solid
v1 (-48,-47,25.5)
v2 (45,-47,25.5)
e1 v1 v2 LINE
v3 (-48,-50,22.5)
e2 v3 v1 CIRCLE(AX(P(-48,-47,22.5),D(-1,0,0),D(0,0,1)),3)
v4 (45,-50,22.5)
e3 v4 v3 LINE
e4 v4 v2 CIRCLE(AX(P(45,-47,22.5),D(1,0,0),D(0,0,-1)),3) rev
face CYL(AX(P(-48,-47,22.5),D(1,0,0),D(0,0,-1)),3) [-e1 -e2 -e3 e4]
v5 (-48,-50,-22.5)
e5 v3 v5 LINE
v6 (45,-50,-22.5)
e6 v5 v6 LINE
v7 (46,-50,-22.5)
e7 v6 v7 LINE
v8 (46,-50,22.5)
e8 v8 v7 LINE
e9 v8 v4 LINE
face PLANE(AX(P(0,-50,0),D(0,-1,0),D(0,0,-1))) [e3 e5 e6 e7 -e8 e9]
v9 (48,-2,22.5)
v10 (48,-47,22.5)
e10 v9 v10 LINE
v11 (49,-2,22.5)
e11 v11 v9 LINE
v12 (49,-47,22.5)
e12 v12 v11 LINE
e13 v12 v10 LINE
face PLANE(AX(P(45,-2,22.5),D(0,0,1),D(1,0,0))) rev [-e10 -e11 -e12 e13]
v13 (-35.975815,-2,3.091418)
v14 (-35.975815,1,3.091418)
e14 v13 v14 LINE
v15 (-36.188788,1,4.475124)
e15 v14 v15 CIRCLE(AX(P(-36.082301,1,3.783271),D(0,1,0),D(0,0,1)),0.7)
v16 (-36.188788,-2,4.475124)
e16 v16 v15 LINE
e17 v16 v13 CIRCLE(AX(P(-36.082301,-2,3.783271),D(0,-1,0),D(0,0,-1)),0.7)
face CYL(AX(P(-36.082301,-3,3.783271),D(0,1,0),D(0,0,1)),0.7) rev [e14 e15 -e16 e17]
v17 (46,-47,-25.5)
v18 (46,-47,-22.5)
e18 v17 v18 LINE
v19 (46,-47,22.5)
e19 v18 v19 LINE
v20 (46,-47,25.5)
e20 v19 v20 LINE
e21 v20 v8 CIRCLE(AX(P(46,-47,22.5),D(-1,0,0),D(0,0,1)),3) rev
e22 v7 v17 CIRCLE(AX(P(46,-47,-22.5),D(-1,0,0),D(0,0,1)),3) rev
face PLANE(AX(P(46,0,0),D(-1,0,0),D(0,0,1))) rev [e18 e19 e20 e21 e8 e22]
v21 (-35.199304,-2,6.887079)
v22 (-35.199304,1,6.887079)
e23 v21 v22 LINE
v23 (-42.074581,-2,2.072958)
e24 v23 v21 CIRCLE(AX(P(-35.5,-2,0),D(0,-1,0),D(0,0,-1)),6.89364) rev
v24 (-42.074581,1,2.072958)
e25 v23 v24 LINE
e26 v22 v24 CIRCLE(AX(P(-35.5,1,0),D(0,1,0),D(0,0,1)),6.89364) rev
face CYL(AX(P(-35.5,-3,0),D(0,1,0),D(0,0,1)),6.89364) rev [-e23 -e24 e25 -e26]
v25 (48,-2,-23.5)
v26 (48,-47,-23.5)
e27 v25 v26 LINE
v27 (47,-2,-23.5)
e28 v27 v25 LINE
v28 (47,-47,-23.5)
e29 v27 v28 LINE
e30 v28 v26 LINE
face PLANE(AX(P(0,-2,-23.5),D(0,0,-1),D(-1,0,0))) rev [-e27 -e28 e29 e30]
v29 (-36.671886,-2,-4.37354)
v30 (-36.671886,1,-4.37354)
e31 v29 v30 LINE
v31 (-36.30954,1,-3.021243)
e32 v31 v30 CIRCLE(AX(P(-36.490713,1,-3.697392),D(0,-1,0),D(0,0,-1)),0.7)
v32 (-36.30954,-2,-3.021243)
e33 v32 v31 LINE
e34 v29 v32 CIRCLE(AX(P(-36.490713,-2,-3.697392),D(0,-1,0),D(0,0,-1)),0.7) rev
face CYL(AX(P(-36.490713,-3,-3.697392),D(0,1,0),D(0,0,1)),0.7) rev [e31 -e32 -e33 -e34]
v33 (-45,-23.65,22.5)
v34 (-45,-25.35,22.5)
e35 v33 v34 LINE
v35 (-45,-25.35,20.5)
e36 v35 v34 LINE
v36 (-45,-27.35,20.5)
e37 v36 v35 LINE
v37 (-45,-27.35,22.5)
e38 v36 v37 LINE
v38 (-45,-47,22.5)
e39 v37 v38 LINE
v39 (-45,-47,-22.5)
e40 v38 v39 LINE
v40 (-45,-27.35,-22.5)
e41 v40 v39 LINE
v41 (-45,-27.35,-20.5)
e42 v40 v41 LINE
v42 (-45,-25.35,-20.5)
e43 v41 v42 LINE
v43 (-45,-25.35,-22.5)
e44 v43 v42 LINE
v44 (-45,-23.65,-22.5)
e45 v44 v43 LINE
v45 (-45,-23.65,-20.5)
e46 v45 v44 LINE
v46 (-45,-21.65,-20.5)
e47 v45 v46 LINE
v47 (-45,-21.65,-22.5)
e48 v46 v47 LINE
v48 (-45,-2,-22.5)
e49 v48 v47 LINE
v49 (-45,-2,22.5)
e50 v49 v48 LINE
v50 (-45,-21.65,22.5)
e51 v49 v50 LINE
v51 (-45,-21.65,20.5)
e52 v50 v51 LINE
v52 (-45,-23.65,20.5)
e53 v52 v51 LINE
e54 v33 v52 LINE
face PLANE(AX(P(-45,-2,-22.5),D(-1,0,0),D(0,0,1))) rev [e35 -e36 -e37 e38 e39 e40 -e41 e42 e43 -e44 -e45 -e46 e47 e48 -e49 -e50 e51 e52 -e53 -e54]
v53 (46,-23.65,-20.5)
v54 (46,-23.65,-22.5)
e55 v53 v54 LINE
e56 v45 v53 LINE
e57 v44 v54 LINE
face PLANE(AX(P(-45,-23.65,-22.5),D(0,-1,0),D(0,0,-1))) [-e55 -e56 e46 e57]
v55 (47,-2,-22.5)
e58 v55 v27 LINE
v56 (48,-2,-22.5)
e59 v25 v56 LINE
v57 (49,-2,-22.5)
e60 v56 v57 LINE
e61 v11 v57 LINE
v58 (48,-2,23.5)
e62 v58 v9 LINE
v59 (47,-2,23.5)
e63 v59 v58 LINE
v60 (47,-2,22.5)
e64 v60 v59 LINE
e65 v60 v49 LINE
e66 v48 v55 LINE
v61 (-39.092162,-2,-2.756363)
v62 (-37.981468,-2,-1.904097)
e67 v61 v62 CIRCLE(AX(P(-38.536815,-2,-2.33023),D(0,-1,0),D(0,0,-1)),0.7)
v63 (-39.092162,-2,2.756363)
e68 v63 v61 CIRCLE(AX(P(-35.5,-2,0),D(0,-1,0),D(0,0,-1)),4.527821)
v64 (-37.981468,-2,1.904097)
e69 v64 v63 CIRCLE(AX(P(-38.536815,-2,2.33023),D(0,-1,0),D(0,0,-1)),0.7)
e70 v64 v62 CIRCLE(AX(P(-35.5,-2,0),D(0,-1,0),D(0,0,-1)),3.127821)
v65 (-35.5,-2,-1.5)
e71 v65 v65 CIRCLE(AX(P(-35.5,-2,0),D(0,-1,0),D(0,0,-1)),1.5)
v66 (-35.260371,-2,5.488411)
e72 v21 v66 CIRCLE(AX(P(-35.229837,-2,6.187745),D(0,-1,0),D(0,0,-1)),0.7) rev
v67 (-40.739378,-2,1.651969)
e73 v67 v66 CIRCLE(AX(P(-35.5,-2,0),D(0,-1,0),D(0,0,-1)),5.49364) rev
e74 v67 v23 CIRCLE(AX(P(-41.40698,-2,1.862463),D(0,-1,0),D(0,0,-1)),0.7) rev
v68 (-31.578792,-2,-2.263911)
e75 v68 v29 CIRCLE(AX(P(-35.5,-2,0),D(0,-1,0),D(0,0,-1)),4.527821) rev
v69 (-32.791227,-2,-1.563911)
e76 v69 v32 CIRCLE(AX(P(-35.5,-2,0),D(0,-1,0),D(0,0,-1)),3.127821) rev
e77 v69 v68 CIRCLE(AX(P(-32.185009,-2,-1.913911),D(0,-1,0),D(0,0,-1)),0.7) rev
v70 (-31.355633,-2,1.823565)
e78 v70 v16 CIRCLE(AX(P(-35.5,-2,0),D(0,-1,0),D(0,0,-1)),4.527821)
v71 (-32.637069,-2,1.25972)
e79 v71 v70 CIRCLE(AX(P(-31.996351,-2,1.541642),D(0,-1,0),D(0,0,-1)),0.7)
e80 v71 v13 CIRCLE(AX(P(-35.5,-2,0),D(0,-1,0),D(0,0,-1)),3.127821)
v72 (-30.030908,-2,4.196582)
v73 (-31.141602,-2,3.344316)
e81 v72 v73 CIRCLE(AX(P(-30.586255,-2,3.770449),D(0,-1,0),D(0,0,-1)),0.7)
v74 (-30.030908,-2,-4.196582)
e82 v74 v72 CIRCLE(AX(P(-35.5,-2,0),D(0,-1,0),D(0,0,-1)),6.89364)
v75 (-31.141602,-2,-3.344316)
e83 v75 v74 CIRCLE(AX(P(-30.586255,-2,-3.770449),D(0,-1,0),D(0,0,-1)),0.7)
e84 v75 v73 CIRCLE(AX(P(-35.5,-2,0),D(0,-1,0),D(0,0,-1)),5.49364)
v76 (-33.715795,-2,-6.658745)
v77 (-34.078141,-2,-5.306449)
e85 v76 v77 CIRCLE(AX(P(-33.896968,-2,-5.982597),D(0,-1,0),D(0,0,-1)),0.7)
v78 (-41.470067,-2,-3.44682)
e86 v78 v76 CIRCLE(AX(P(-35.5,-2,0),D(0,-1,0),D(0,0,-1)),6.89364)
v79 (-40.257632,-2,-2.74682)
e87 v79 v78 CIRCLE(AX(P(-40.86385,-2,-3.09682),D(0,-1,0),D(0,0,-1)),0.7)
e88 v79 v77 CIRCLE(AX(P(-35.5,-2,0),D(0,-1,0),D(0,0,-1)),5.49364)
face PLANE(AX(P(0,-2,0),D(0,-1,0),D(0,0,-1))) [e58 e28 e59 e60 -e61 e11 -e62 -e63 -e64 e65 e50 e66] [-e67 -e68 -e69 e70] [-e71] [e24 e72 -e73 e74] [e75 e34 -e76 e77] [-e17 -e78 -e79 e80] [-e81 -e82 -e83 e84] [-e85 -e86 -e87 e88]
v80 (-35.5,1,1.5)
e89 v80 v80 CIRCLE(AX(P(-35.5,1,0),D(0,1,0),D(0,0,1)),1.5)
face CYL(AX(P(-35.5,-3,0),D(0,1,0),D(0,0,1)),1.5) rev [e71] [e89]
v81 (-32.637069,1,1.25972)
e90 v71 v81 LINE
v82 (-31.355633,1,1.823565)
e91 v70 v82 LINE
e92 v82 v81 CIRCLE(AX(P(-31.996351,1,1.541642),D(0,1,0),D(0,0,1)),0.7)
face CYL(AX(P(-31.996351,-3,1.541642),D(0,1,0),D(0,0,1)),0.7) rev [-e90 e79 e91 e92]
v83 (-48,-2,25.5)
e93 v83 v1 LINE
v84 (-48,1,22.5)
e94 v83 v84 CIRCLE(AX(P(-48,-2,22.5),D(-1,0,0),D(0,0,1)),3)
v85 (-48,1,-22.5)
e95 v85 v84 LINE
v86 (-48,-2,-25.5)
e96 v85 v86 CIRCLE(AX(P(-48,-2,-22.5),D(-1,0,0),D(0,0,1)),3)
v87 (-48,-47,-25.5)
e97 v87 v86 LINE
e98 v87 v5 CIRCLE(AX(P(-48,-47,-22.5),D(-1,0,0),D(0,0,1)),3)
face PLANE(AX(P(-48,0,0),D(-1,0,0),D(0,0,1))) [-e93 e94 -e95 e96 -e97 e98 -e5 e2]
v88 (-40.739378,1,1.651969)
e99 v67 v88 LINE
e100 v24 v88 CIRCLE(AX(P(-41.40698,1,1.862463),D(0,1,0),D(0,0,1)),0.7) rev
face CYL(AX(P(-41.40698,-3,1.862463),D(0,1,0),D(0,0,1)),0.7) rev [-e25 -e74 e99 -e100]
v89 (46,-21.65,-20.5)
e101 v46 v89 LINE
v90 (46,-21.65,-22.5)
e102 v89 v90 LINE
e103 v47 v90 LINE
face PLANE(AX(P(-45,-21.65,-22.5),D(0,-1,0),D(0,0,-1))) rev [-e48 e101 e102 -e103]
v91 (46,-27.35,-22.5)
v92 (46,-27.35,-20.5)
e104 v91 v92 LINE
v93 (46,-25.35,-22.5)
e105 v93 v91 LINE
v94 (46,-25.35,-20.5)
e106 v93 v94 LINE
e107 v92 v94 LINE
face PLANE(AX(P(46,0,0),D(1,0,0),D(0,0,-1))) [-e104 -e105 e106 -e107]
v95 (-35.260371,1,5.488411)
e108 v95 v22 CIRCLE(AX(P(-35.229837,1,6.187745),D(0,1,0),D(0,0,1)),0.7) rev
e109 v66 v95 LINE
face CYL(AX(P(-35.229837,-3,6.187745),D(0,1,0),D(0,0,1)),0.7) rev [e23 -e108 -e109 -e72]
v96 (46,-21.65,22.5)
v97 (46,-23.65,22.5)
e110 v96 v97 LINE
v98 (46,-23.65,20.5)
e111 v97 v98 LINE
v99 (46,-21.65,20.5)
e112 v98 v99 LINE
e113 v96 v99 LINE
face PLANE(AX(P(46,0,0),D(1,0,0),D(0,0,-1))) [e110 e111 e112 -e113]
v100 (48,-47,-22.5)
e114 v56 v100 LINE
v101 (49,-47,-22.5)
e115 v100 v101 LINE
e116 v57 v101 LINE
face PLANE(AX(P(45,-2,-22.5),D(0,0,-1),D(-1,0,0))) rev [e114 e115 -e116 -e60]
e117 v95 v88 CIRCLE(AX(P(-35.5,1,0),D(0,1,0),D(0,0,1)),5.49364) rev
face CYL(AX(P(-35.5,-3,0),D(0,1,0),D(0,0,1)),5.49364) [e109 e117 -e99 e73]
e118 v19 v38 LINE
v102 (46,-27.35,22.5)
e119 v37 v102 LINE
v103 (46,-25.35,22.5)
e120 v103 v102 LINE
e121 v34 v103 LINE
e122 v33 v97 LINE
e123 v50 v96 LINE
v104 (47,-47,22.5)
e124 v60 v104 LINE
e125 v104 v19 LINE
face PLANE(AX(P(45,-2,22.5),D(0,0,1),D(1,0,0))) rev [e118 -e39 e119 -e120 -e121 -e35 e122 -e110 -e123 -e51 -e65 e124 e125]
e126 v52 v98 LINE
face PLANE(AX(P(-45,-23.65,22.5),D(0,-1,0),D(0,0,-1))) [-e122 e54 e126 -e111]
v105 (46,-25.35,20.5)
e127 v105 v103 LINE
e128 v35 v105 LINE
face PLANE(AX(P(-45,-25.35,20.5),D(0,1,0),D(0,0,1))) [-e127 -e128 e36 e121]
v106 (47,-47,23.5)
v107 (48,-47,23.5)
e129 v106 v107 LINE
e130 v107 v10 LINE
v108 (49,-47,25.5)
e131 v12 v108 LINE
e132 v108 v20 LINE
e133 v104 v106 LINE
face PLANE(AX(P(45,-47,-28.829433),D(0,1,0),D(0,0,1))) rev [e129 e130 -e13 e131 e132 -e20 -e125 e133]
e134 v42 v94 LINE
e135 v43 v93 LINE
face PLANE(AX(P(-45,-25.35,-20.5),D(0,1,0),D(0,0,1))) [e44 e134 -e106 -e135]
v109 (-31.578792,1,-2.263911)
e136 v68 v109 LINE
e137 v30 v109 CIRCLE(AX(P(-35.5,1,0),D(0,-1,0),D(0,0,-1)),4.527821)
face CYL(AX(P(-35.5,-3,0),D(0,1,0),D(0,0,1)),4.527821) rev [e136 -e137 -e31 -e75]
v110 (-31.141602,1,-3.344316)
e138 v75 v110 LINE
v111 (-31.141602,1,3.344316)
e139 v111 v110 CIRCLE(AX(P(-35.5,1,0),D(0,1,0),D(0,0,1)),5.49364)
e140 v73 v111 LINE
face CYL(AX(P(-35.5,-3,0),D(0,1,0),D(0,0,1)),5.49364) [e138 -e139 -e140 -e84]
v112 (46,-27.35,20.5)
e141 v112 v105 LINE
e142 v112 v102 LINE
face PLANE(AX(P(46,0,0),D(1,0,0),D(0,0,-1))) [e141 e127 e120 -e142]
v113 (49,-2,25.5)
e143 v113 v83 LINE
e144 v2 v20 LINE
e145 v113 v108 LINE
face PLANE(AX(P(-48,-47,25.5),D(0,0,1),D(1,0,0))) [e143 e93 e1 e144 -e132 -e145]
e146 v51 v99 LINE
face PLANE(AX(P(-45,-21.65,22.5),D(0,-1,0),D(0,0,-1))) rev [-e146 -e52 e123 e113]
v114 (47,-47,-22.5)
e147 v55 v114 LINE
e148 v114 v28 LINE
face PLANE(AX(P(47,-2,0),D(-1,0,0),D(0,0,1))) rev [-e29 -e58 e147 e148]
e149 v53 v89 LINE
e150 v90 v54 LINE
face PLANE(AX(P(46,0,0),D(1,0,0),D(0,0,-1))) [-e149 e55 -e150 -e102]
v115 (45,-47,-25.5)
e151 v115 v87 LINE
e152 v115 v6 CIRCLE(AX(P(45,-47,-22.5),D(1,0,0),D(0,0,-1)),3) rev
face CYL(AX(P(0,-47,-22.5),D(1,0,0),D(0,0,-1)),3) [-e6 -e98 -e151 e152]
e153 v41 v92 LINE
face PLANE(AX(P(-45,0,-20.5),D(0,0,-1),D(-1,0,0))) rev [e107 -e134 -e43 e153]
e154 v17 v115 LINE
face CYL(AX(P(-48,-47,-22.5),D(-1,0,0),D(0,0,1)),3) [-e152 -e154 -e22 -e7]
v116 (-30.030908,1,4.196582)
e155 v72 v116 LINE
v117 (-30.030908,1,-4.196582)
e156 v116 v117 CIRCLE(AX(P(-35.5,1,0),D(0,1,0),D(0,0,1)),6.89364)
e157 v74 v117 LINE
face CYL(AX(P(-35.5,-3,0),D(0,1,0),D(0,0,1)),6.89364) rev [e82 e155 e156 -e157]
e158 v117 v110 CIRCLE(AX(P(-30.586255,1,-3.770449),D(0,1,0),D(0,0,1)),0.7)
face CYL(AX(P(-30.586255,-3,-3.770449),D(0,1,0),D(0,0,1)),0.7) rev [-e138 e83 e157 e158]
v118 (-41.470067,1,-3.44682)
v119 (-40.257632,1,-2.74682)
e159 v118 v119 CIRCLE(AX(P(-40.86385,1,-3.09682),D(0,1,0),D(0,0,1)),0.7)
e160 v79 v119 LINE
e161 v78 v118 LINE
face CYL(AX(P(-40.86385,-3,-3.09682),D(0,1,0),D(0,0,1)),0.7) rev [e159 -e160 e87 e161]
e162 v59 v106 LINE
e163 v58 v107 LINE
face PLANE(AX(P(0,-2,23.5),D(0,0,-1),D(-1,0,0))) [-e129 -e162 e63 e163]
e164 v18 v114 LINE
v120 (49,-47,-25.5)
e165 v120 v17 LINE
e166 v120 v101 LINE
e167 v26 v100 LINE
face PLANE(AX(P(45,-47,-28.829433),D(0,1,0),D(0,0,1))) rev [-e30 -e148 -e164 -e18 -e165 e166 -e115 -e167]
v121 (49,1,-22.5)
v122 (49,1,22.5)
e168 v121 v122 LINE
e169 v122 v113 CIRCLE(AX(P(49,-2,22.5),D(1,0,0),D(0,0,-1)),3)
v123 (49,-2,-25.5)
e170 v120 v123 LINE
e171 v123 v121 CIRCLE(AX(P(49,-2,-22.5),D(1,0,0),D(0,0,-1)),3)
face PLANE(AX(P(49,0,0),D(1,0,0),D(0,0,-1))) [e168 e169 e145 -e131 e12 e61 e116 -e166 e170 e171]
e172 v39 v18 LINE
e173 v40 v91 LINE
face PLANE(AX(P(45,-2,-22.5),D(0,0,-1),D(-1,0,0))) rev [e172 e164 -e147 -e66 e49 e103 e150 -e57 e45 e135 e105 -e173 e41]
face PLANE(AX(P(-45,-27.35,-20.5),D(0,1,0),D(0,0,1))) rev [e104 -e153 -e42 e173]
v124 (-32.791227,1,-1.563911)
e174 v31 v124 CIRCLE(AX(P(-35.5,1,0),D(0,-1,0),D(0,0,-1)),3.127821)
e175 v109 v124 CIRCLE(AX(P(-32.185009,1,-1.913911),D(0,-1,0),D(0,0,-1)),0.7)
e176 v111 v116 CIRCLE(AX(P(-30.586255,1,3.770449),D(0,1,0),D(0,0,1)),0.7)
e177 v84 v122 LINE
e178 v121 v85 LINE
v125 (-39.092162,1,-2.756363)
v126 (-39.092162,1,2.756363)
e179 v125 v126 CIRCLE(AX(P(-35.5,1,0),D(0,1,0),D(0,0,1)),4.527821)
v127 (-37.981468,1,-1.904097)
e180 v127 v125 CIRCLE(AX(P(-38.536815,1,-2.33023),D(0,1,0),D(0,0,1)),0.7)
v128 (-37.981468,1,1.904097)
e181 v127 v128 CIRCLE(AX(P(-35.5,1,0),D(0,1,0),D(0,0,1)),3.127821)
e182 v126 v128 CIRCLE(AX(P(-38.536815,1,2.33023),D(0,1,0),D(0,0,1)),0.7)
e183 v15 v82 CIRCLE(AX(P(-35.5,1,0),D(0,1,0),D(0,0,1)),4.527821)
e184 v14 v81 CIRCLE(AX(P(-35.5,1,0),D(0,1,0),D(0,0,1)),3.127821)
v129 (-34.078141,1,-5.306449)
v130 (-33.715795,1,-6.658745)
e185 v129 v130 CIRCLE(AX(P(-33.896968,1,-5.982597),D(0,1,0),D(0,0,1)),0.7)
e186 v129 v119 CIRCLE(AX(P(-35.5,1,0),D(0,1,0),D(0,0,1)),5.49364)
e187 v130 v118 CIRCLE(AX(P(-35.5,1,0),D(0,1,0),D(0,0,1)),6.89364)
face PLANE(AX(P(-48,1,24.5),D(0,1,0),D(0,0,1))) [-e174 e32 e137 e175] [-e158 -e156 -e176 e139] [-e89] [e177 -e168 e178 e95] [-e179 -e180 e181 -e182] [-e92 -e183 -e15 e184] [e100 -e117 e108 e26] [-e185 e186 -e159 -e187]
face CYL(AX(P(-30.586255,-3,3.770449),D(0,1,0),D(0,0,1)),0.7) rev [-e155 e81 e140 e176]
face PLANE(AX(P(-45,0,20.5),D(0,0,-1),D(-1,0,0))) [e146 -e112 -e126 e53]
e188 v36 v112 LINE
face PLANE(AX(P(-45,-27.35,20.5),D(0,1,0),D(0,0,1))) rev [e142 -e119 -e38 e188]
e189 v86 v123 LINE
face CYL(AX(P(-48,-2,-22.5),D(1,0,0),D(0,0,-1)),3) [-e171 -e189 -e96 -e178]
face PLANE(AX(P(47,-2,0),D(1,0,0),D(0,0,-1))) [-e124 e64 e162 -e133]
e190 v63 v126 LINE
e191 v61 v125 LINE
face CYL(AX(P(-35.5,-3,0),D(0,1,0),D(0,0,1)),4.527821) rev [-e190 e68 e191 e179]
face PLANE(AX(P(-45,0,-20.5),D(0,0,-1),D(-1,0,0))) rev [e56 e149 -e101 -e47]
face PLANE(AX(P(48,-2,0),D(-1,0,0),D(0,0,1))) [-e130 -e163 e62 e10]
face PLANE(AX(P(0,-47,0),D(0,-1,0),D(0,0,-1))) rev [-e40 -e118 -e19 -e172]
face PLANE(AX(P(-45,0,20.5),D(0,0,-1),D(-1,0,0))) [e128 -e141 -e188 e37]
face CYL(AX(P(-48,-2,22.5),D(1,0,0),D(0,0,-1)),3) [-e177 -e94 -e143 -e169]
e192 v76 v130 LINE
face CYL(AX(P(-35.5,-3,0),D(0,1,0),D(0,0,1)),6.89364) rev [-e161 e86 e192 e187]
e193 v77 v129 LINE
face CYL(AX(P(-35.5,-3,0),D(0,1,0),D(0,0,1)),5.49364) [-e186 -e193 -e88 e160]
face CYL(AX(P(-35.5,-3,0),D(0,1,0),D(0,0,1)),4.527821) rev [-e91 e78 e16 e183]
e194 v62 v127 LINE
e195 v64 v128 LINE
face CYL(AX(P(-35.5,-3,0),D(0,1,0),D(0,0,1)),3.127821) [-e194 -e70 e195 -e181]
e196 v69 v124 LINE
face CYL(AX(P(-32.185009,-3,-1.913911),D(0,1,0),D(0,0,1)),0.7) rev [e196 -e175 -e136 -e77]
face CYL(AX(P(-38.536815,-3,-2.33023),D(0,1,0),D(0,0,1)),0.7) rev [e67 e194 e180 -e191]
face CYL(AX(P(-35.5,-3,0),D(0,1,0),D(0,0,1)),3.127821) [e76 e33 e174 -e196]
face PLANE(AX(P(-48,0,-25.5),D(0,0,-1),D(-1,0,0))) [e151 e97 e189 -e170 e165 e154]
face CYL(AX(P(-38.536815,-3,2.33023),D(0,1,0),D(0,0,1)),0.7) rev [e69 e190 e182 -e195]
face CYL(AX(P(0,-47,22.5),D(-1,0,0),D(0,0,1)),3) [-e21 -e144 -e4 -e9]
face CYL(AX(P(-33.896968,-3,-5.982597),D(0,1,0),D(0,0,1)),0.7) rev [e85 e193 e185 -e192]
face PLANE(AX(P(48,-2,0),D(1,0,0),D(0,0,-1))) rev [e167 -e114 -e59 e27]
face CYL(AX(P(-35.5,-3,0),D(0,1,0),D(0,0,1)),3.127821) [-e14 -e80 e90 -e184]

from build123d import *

# Parameters (mm, degrees)
SKETCH1_W               = 94
SKETCH1_H               = 49
BOSS_EXTRUDE1_DEPTH     = 47
SKETCH3_W               = 90
SKETCH3_H               = 45
CUT_EXTRUDE1_DEPTH      = 45
SKETCH4_W               = 49
SKETCH4_H               = 47
CUT_EXTRUDE2_DEPTH      = 2
SKETCH5_W               = 45
SKETCH5_H               = 2
BOSS_EXTRUDE2_DEPTH     = 2
SKETCH6_W               = 90
SKETCH6_H               = 2
BOSS_EXTRUDE3_DEPTH     = 2
SKETCH7_W               = 92
SKETCH7_H               = 2
BOSS_EXTRUDE4_DEPTH     = 2
SKETCH8_W               = 92
SKETCH8_H               = 2
BOSS_EXTRUDE5_DEPTH     = 2
BOSS_EXTRUDE6_DEPTH     = 2
FILLET5_R               = 3
CUT_EXTRUDE3_DEPTH      = 1
SKETCH13_W              = 92
SKETCH13_H              = 49
BOSS_EXTRUDE7_DEPTH     = 3
FILLET7_R               = 3
SKETCH14_W              = 9
SKETCH14_H              = 5.086357456
CUT_EXTRUDE4_DEPTH      = 8
SKETCH24_W              = 1.177367679
SKETCH24_H              = 45
BOSS_EXTRUDE9_DEPTH     = 2
BOSS_EXTRUDE10_DEPTH    = 1
FILLET9_R               = 3
SKETCH26_W              = 1
SKETCH26_H              = 1
CUT_EXTRUDE10_DEPTH     = 45
SKETCH15_W              = 82
SKETCH15_H              = 1
CUT_EXTRUDE5_DEPTH      = 1
SKETCH16_W              = 64
SKETCH16_H              = 1
SKETCH16_W_2            = 18
CUT_EXTRUDE6_DEPTH      = 1
SKETCH17_W              = 3.897080767
SKETCH17_H              = 1
SKETCH17_W_2            = 0.189276689
CUT_EXTRUDE7_DEPTH      = 1
SKETCH18_W              = 4.086357456
SKETCH18_H              = 1
CUT_EXTRUDE8_DEPTH      = 1
CUT_EXTRUDE9_DEPTH      = 1
BOSS_EXTRUDE11_DEPTH    = 14
SKETCH28_W              = 1
SKETCH28_H              = 45
BOSS_EXTRUDE12_DEPTH    = 1
SKETCH30_W              = 45
SKETCH30_H              = 45
CUT_EXTRUDE11_DEPTH     = 93
SKETCH31_W              = 46
SKETCH31_H              = 2
SKETCH31_W_2            = 91
SKETCH31_W_3            = 45
BOSS_EXTRUDE13_DEPTH    = 2
SKETCH32_W              = 95
SKETCH32_H              = 2
BOSS_EXTRUDE14_DEPTH    = 2
SKETCH34_W              = 45
SKETCH34_H              = 45
CUT_EXTRUDE14_DEPTH     = 93
SKETCH35_W              = 46
SKETCH35_H              = 2
SKETCH35_W_2            = 91
SKETCH35_W_3            = 45
BOSS_EXTRUDE15_DEPTH    = 2
SKETCH36_W              = 93
SKETCH36_H              = 2
BOSS_EXTRUDE16_DEPTH    = 2
SKETCH41_R              = 1.5
SKETCH41_R_2            = 1
SKETCH41_R_3            = 0.5
CUT_EXTRUDE15_DEPTH     = 3
BOSS_EXTRUDE17_DEPTH    = 1
SKETCH43_W              = 1
SKETCH43_H              = 1
BOSS_EXTRUDE18_DEPTH    = 45
SKETCH44_W              = 1
SKETCH44_H              = 1
BOSS_EXTRUDE19_DEPTH    = 45
SKETCH45_W              = 1
SKETCH45_H              = 1
CUT_EXTRUDE16_DEPTH     = 45
SKETCH46_W              = 1
SKETCH46_H              = 1
CUT_EXTRUDE17_DEPTH     = 45
BOSS_EXTRUDE20_DEPTH    = 97
BOSS_EXTRUDE21_DEPTH    = 1
SKETCH49_W              = 10
SKETCH49_H              = 3
BOSS_EXTRUDE22_DEPTH    = 93
FILLET10_R              = 3
SKETCH50_W              = 63.688215056
SKETCH50_H              = 6.387440079
CUT_EXTRUDE22_DEPTH     = 4
SKETCH51_R              = 1.5
SKETCH51_R_2            = 1
SKETCH51_R_3            = 0.5
CUT_EXTRUDE23_DEPTH     = 4
SKETCH52_W              = 4.691338673
SKETCH52_H              = 3.113312294
BOSS_EXTRUDE24_DEPTH    = 4
CUT_EXTRUDE24_DEPTH     = 91
CUT_EXTRUDE26_START     = -45
CUT_EXTRUDE26_OUTLINE_W = 2
CUT_EXTRUDE26_OUTLINE_H = 2
CUT_EXTRUDE26_DEPTH     = 91
SKETCH55_W              = 2
SKETCH55_H              = 2
BOSS_EXTRUDE25_DEPTH    = 91
SKETCH56_W              = 8.630272554
SKETCH56_H              = 5.114235588
CUT_EXTRUDE27_DEPTH     = 63
SKETCH57_W              = 1
SKETCH57_H              = 1
CUT_EXTRUDE28_DEPTH     = 45
SKETCH58_W              = 2
SKETCH58_H              = 0.05
BOSS_EXTRUDE27_DEPTH    = 91
SKETCH60_W              = 2
SKETCH60_H              = 0.05
CUT_EXTRUDE29_DEPTH     = 91
SKETCH62_W              = 82
SKETCH62_H              = 1
CUT_EXTRUDE30_DEPTH     = 10
SKETCH63_W              = 82
SKETCH63_H              = 1
BOSS_EXTRUDE28_DEPTH    = 3
SKETCH64_W              = 2
SKETCH64_H              = 2
BOSS_EXTRUDE29_DEPTH    = 90
SKETCH66_W              = 1.5
SKETCH66_H              = 1
CUT_EXTRUDE31_DEPTH     = 82
SKETCH67_W              = 25.589356111
SKETCH67_H              = 3
BOSS_EXTRUDE30_DEPTH    = 82
SKETCH69_W              = 51
SKETCH69_H              = 3
BOSS_EXTRUDE31_DEPTH    = 1
FILLET11_R              = 3


# Read off the part's stored shape, not the designer's step: Cut-Extrude26
with BuildPart() as part:
    # Sketch1 → Boss-Extrude1 (new body)
    with BuildSketch(Plane(origin=(0, 0, 0), x_dir=(1, 0, 0), z_dir=(0, 1, 0))):
        Rectangle(SKETCH1_W, SKETCH1_H)
    extrude(amount=-BOSS_EXTRUDE1_DEPTH)

    # Sketch3 → Cut-Extrude1 (cut)
    with BuildSketch(Plane(origin=(0, -47, 0), x_dir=(-1, 0, 0), z_dir=(0, -1, 0))):
        Rectangle(SKETCH3_W, SKETCH3_H)
    extrude(amount=-CUT_EXTRUDE1_DEPTH, mode=Mode.SUBTRACT)

    # Sketch4 → Cut-Extrude2 (cut)
    with BuildSketch(Plane(origin=(47, 0, 0), x_dir=(0, 0, -1), z_dir=(1, 0, 0))):
        with Locations((0, -23.5)):
            Rectangle(SKETCH4_W, SKETCH4_H)
    extrude(amount=-CUT_EXTRUDE2_DEPTH, mode=Mode.SUBTRACT)

    # Sketch5 → Boss-Extrude2 (add)
    with BuildSketch(Plane(origin=(0, 0, 22.5), x_dir=(-1, 0, 0), z_dir=(0, 0, -1))):
        with Locations((-22.5, -21)):
            Rectangle(SKETCH5_W, SKETCH5_H)
        with Locations((22.5, -21)):
            Rectangle(SKETCH5_W, SKETCH5_H)
    extrude(amount=BOSS_EXTRUDE2_DEPTH)

    # Sketch6 → Boss-Extrude3 (add)
    with BuildSketch(Plane.XY.offset(-22.5)):
        with Locations((0, -21)):
            Rectangle(SKETCH6_W, SKETCH6_H)
    extrude(amount=BOSS_EXTRUDE3_DEPTH)

    # Sketch7 → Boss-Extrude4 (add)
    with BuildSketch(Plane(origin=(0, 0, 22.5), x_dir=(-1, 0, 0), z_dir=(0, 0, -1))):
        with Locations((1, -24.6)):
            Rectangle(SKETCH7_W, SKETCH7_H)
    extrude(amount=BOSS_EXTRUDE4_DEPTH)

    # Sketch8 → Boss-Extrude5 (add)
    with BuildSketch(Plane.XY.offset(-22.5)):
        with Locations((-1, -24.6)):
            Rectangle(SKETCH8_W, SKETCH8_H)
    extrude(amount=BOSS_EXTRUDE5_DEPTH)

    # Sketch9 → Boss-Extrude6 (add)
    with BuildSketch(Plane(origin=(45, 0, 0), x_dir=(0, 0, -1), z_dir=(1, 0, 0))):
        Polygon((-24.5, -2), (-24.5, -47), (-22.5, -47), (-22.5, -2), (22.5, -2), (22.5, -47), (24.5, -47), (24.5, 0), (-22.5, 0), (-24.5, 0), align=None)
    extrude(amount=BOSS_EXTRUDE6_DEPTH)

    # Fillet5
    fillet5_edges = [part.edges().sort_by_distance(p)[0] for p in [
        (0, 0, -24.5),
        (0, 0, 24.5),
    ]]
    fillet(fillet5_edges, radius=FILLET5_R)

    # Sketch10 → Cut-Extrude3 (cut)
    with BuildSketch(Plane.XY.offset(-22.5)):
        Polygon((45, -22), (45, -47), (46, -47), (46, -3), (46, -2), (45, -2), (45, -3), align=None)
    extrude(amount=-CUT_EXTRUDE3_DEPTH, mode=Mode.SUBTRACT)

    # Sketch13 → Boss-Extrude7 (add)
    with BuildSketch(Plane.XZ.offset(47)):
        with Locations((-1, 0)):
            Rectangle(SKETCH13_W, SKETCH13_H)
    extrude(amount=BOSS_EXTRUDE7_DEPTH)

    # Fillet7
    fillet7_edges = [part.edges().sort_by_distance(p)[0] for p in [
        (-1, -50, -24.5),
        (-1, -50, 24.5),
    ]]
    fillet(fillet7_edges, radius=FILLET7_R)

    # Sketch14 → Cut-Extrude4 (cut)
    with BuildSketch(Plane.XZ.offset(50)):
        Polygon((-37, -9.5), (45, -9.5), (45, 11.5), (36, 11.5), (27, 11.5), (-37, 11.5), align=None)
        with Locations((31.5, 14.043178728)):
            Rectangle(SKETCH14_W, SKETCH14_H)
    extrude(amount=-CUT_EXTRUDE4_DEPTH, mode=Mode.SUBTRACT)

    # Sketch24 → Boss-Extrude9 (add)
    with BuildSketch(Plane(origin=(45, 0, 0), x_dir=(0, 0, -1), z_dir=(1, 0, 0))):
        with Locations((23.088683839, -24.5)):
            Rectangle(SKETCH24_W, SKETCH24_H)
    extrude(amount=BOSS_EXTRUDE9_DEPTH)

    # Sketch25 → Boss-Extrude10 (add)
    with BuildSketch(Plane(origin=(47, 0, 0), x_dir=(0, 0, -1), z_dir=(1, 0, 0))):
        Polygon((-24.5, -47), (-22.5, -47), (-22.5, -2), (22.5, -2), (22.5, -47), (24.5, -47), (24.5, 0), (-24.5, 0), align=None)
    extrude(amount=BOSS_EXTRUDE10_DEPTH)

    # Fillet9
    fillet9_edges = [part.edges().sort_by_distance(p)[0] for p in [
        (47.5, 0, 24.5),
        (47.5, 0, -24.5),
    ]]
    fillet(fillet9_edges, radius=FILLET9_R)

    # Sketch26 → Cut-Extrude10 (cut)
    with BuildSketch(Plane.XZ.offset(47)):
        with Locations((46.5, 23)):
            Rectangle(SKETCH26_W, SKETCH26_H)
        with Locations((46.5, -23)):
            Rectangle(SKETCH26_W, SKETCH26_H)
    extrude(amount=-CUT_EXTRUDE10_DEPTH, mode=Mode.SUBTRACT)

    # Sketch15 → Cut-Extrude5 (cut)
    with BuildSketch(Plane.XY.offset(-9.5)):
        with Locations((4, -48.5)):
            Rectangle(SKETCH15_W, SKETCH15_H)
    extrude(amount=-CUT_EXTRUDE5_DEPTH, mode=Mode.SUBTRACT)

    # Sketch16 → Cut-Extrude6 (cut)
    with BuildSketch(Plane(origin=(0, 0, 11.5), x_dir=(-1, 0, 0), z_dir=(0, 0, -1))):
        with Locations((5, -48.5)):
            Rectangle(SKETCH16_W, SKETCH16_H)
        with Locations((-36, -48.5)):
            Rectangle(SKETCH16_W_2, SKETCH16_H)
    extrude(amount=-CUT_EXTRUDE6_DEPTH, mode=Mode.SUBTRACT)

    # Sketch17 → Cut-Extrude7 (cut)
    with BuildSketch(Plane(origin=(27, 0, 0), x_dir=(0, 0, -1), z_dir=(1, 0, 0))):
        with Locations((-14.448540384, -48.5)):
            Rectangle(SKETCH17_W, SKETCH17_H)
        with Locations((-16.491719112, -48.5)):
            Rectangle(SKETCH17_W_2, SKETCH17_H)
    extrude(amount=-CUT_EXTRUDE7_DEPTH, mode=Mode.SUBTRACT)

    # Sketch18 → Cut-Extrude8 (cut)
    with BuildSketch(Plane.ZY.offset(-36)):
        with Locations((14.543178728, -48.5)):
            Rectangle(SKETCH18_W, SKETCH18_H)
    extrude(amount=-CUT_EXTRUDE8_DEPTH, mode=Mode.SUBTRACT)

    # Sketch11 → Cut-Extrude9 (cut)
    with BuildSketch(Plane(origin=(0, 0, 22.5), x_dir=(-1, 0, 0), z_dir=(0, 0, -1))):
        Polygon((-45, -22), (-45, -47), (-46, -47), (-46, -2), (-45, -2), align=None)
    extrude(amount=-CUT_EXTRUDE9_DEPTH, mode=Mode.SUBTRACT)

    # Sketch27 → Boss-Extrude11 (add)
    with BuildSketch(Plane(origin=(26, 0, 0), x_dir=(0, 0, -1), z_dir=(1, 0, 0))):
        Polygon((-12.5, -49), (-11.5, -49), (-11.5, -50), (-16.586357456, -50), (-17.508696805, -50), (-17.508696805, -47), (-11.5, -47), (-11.5, -48), (-12.5, -48), align=None)
    extrude(amount=BOSS_EXTRUDE11_DEPTH)

    # Sketch28 → Boss-Extrude12 (add)
    with BuildSketch(Plane(origin=(45, 0, 0), x_dir=(0, 0, -1), z_dir=(1, 0, 0))):
        with Locations((-23, -24.5)):
            Rectangle(SKETCH28_W, SKETCH28_H)
    extrude(amount=BOSS_EXTRUDE12_DEPTH)

    # Sketch30 → Cut-Extrude11 (cut)
    with BuildSketch(Plane(origin=(48, 0, 0), x_dir=(0, 0, -1), z_dir=(1, 0, 0))):
        with Locations((0, -24.5)):
            Rectangle(SKETCH30_W, SKETCH30_H)
    extrude(amount=-CUT_EXTRUDE11_DEPTH, mode=Mode.SUBTRACT)

    # Sketch31 → Boss-Extrude13 (add)
    with BuildSketch(Plane(origin=(0, 0, 22.5), x_dir=(-1, 0, 0), z_dir=(0, 0, -1))):
        with Locations((-23, -20.6)):
            Rectangle(SKETCH31_W, SKETCH31_H)
        with Locations((-0.5, -24.4)):
            Rectangle(SKETCH31_W_2, SKETCH31_H)
        with Locations((22.5, -20.6)):
            Rectangle(SKETCH31_W_3, SKETCH31_H)
    extrude(amount=BOSS_EXTRUDE13_DEPTH)

    # Sketch32 → Boss-Extrude14 (add)
    with BuildSketch(Plane.XY.offset(-22.5)):
        with Locations((0.5, -20.6)):
            Rectangle(SKETCH32_W, SKETCH32_H)
        with Locations((0.5, -24.4)):
            Rectangle(SKETCH32_W, SKETCH32_H)
    extrude(amount=BOSS_EXTRUDE14_DEPTH)

    # Sketch34 → Cut-Extrude14 (cut)
    with BuildSketch(Plane(origin=(48, 0, 0), x_dir=(0, 0, -1), z_dir=(1, 0, 0))):
        with Locations((0, -24.5)):
            Rectangle(SKETCH34_W, SKETCH34_H)
    extrude(amount=-CUT_EXTRUDE14_DEPTH, mode=Mode.SUBTRACT)

    # Sketch35 → Boss-Extrude15 (add)
    with BuildSketch(Plane(origin=(0, 0, 22.5), x_dir=(-1, 0, 0), z_dir=(0, 0, -1))):
        with Locations((-23, -20.6)):
            Rectangle(SKETCH35_W, SKETCH35_H)
        with Locations((-0.5, -24.4)):
            Rectangle(SKETCH35_W_2, SKETCH35_H)
        with Locations((22.5, -20.6)):
            Rectangle(SKETCH35_W_3, SKETCH35_H)
    extrude(amount=BOSS_EXTRUDE15_DEPTH)

    # Sketch36 → Boss-Extrude16 (add)
    with BuildSketch(Plane.XY.offset(-22.5)):
        with Locations((-0.5, -20.6)):
            Rectangle(SKETCH36_W, SKETCH36_H)
        with Locations((-0.5, -24.4)):
            Rectangle(SKETCH36_W, SKETCH36_H)
    extrude(amount=BOSS_EXTRUDE16_DEPTH)

    # Sketch41 → Cut-Extrude15 (cut)
    # profile 1 of 9: a face of its own
    with BuildSketch(Plane(origin=(0, 0, 0), x_dir=(1, 0, 0), z_dir=(0, 1, 0))):
        with BuildLine():
            ThreePointArc((-33.685162112, 6.650461434), (-38.123416229, 6.374947932), (-41.470067452, 3.446820051))
            ThreePointArc((-41.470067452, 3.446820051), (-41.213849669, 2.490602268), (-40.257631887, 2.746820051))
            ThreePointArc((-40.257631887, 2.746820051), (-37.590637803, 5.080286915), (-34.053729807, 5.299847553))
            ThreePointArc((-34.053729807, 5.299847553), (-33.194139019, 5.790870646), (-33.685162112, 6.650461434))
        make_face()
    # profile 2 of 9: a face of its own
    with BuildSketch(Plane(origin=(0, 0, 0), x_dir=(1, 0, 0), z_dir=(0, 1, 0))):
        with BuildLine():
            ThreePointArc((-31.578791687, 2.263910675), (-31.83500947, 1.307692892), (-32.791227253, 1.563910675))
            ThreePointArc((-32.791227253, 1.563910675), (-34.30303459, 2.889730126), (-36.309539735, 3.021243422))
            ThreePointArc((-36.309539735, 3.021243422), (-37.166861145, 3.516218168), (-36.671886398, 4.373539578))
            ThreePointArc((-36.671886398, 4.373539578), (-33.767277785, 4.183161472), (-31.578791687, 2.263910675))
        make_face()
    # profile 3 of 9: a face of its own
    with BuildSketch(Plane(origin=(0, 0, 0), x_dir=(1, 0, 0), z_dir=(0, 1, 0))):
        with BuildLine():
            ThreePointArc((-30.030907599, -4.196582199), (-28.606359899, 0), (-30.030907599, 4.196582199))
            ThreePointArc((-30.030907599, 4.196582199), (-31.012387938, 4.325796537), (-31.141602275, 3.344316198))
            ThreePointArc((-31.141602275, 3.344316198), (-30.006359899, 0), (-31.141602275, -3.344316198))
            ThreePointArc((-31.141602275, -3.344316198), (-31.012387938, -4.325796537), (-30.030907599, -4.196582199))
        make_face()
    # profile 4 of 9: a face of its own
    with BuildSketch(Plane(origin=(0, 0, 0), x_dir=(1, 0, 0), z_dir=(0, 1, 0))):
        with BuildLine():
            ThreePointArc((-39.092162192, 2.756362995), (-40.02782135, 0), (-39.092162192, -2.756362995))
            ThreePointArc((-39.092162192, -2.756362995), (-38.110681853, -2.885577333), (-37.981467516, -1.904096994))
            ThreePointArc((-37.981467516, -1.904096994), (-38.62782135, 0), (-37.981467516, 1.904096994))
            ThreePointArc((-37.981467516, 1.904096994), (-38.110681853, 2.885577333), (-39.092162192, 2.756362995))
        make_face()
    # profile 5 of 9: a face of its own
    with BuildSketch(Plane(origin=(0, 0, 0), x_dir=(1, 0, 0), z_dir=(0, 1, 0))):
        with BuildLine():
            ThreePointArc((-42.074581417, -2.072957558), (-41.617473611, -1.194861633), (-40.739377686, -1.651969439))
            ThreePointArc((-40.739377686, -1.651969439), (-38.640656678, -4.507366991), (-35.235109144, -5.487250167))
            ThreePointArc((-35.235109144, -5.487250167), (-34.502170938, -6.15268355), (-35.167604321, -6.885621755))
            ThreePointArc((-35.167604321, -6.885621755), (-39.441022059, -5.656025016), (-42.074581417, -2.072957558))
        make_face()
    # profile 6 of 9: a face of its own
    with BuildSketch(Plane(origin=(0, 0, 0), x_dir=(1, 0, 0), z_dir=(0, 1, 0))):
        with BuildLine():
            ThreePointArc((-36.188787516, -4.475124348), (-33.322168783, -3.969662122), (-31.355633143, -1.823565061))
            ThreePointArc((-31.355633143, -1.823565061), (-31.714428496, -0.900924343), (-32.637069214, -1.259719695))
            ThreePointArc((-32.637069214, -1.259719695), (-33.99555306, -2.742244664), (-35.975814775, -3.091418234))
            ThreePointArc((-35.975814775, -3.091418234), (-36.774154203, -3.676784921), (-36.188787516, -4.475124348))
        make_face()
    # profile 7 of 9: a face of its own
    with BuildSketch(Plane(origin=(0, 0, 0), x_dir=(1, 0, 0), z_dir=(0, 1, 0))):
        with Locations(Location((-35.5, 0, 0), (0, 0, 270))):
            Circle(SKETCH41_R)
        with Locations((-35.5, 0)):
            Circle(SKETCH41_R_2, mode=Mode.SUBTRACT)
    # profile 8 of 9: a face of its own
    with BuildSketch(Plane(origin=(0, 0, 0), x_dir=(1, 0, 0), z_dir=(0, 1, 0))):
        with Locations((-35.5, 0)):
            Circle(SKETCH41_R_2)
        with Locations((-35.5, 0)):
            Circle(SKETCH41_R_3, mode=Mode.SUBTRACT)
    # profile 9 of 9: a face of its own
    with BuildSketch(Plane(origin=(0, 0, 0), x_dir=(1, 0, 0), z_dir=(0, 1, 0))):
        with Locations((-35.5, 0)):
            Circle(SKETCH41_R_3)
    extrude(amount=-CUT_EXTRUDE15_DEPTH, mode=Mode.SUBTRACT)

    # Sketch42 → Boss-Extrude17 (add)
    with BuildSketch(Plane(origin=(48, 0, 0), x_dir=(0, 0, -1), z_dir=(1, 0, 0))):
        Polygon((-24.5, -47), (-24.5, 0), (24.5, 0), (24.5, -47), (22.5, -47), (22.5, -2), (-22.5, -2), (-22.5, -47), align=None)
    extrude(amount=BOSS_EXTRUDE17_DEPTH)

    # Sketch43 → Boss-Extrude18 (add)
    with BuildSketch(Plane.XZ.offset(47)):
        with Locations((46.5, -23)):
            Rectangle(SKETCH43_W, SKETCH43_H)
    extrude(amount=-BOSS_EXTRUDE18_DEPTH)

    # Sketch44 → Boss-Extrude19 (add)
    with BuildSketch(Plane.XZ.offset(47)):
        with Locations((46.5, 23)):
            Rectangle(SKETCH44_W, SKETCH44_H)
    extrude(amount=-BOSS_EXTRUDE19_DEPTH)

    # Sketch45 → Cut-Extrude16 (cut)
    with BuildSketch(Plane.XZ.offset(47)):
        with Locations((47.5, -23)):
            Rectangle(SKETCH45_W, SKETCH45_H)
    extrude(amount=-CUT_EXTRUDE16_DEPTH, mode=Mode.SUBTRACT)

    # Sketch46 → Cut-Extrude17 (cut)
    with BuildSketch(Plane.XZ.offset(47)):
        with Locations((47.5, 23)):
            Rectangle(SKETCH46_W, SKETCH46_H)
    extrude(amount=-CUT_EXTRUDE17_DEPTH, mode=Mode.SUBTRACT)

    # Sketch47 → Boss-Extrude20 (add)
    with BuildSketch(Plane(origin=(49, 0, 0), x_dir=(0, 0, -1), z_dir=(1, 0, 0))):
        Polygon((-22.5, -47), (-22.5, -2), (22.5, -2), (22.5, -47), (22.5, -50), (25.5, -50), (25.5, 0), (25.5, 1), (-24.5, 1), (-25.5, 1), (-25.5, -47), (-25.5, -50), (-22.5, -50), align=None)
    extrude(amount=-BOSS_EXTRUDE20_DEPTH)

    # Sketch48 → Boss-Extrude21 (add)
    with BuildSketch(Plane.ZY.offset(47)):
        Polygon((-22.5, -50), (22.5, -50), (22.5, -2), (-22.5, -2), (-22.5, -49.828427125), align=None)
    extrude(amount=BOSS_EXTRUDE21_DEPTH)

    # Sketch49 → Boss-Extrude22 (add)
    with BuildSketch(Plane(origin=(45, 0, 0), x_dir=(0, 0, -1), z_dir=(1, 0, 0))):
        Polygon((-25.5, -50), (-16.80635026, -50), (-17, -47), (-25.5, -47), align=None)
        with Locations((20.5, -48.5)):
            Rectangle(SKETCH49_W, SKETCH49_H)
    extrude(amount=-BOSS_EXTRUDE22_DEPTH)

    # Fillet10
    fillet10_edges = [part.edges().sort_by_distance(p)[0] for p in [
        (0.5, 1, -25.5),
        (0.5, 1, 25.5),
        (0.5, -50, 25.5),
        (0.5, -50, -25.5),
    ]]
    fillet(fillet10_edges, radius=FILLET10_R)

    # Sketch50 → Cut-Extrude22 (cut)
    with BuildSketch(Plane(origin=(49, 0, 0), x_dir=(0, 0, -1), z_dir=(1, 0, 0))):
        with Locations((-3.014674481, -50.19372004)):
            Rectangle(SKETCH50_W, SKETCH50_H)
    extrude(amount=-CUT_EXTRUDE22_DEPTH, mode=Mode.SUBTRACT)

    # Sketch51 → Cut-Extrude23 (cut)
    # profile 1 of 9: a face of its own
    with BuildSketch(Plane(origin=(0, 1, 0), x_dir=(1, 0, 0), z_dir=(0, 1, 0))):
        with BuildLine():
            ThreePointArc((-33.715794652, 6.658745011), (-38.138081855, 6.368892994), (-41.470067452, 3.446820051))
            ThreePointArc((-41.470067452, 3.446820051), (-41.213849669, 2.490602268), (-40.257631887, 2.746820051))
            ThreePointArc((-40.257631887, 2.746820051), (-37.60232505, 5.075461648), (-34.078141315, 5.306448854))
            ThreePointArc((-34.078141315, 5.306448854), (-33.220819905, 5.801423601), (-33.715794652, 6.658745011))
        make_face()
    # profile 2 of 9: a face of its own
    with BuildSketch(Plane(origin=(0, 1, 0), x_dir=(1, 0, 0), z_dir=(0, 1, 0))):
        with BuildLine():
            ThreePointArc((-42.074581417, -2.072957558), (-41.617473611, -1.194861633), (-40.739377686, -1.651969439))
            ThreePointArc((-40.739377686, -1.651969439), (-38.651022512, -4.500126519), (-35.260370784, -5.488411373))
            ThreePointArc((-35.260370784, -5.488411373), (-34.530503458, -6.157211557), (-35.199303642, -6.887078883))
            ThreePointArc((-35.199303642, -6.887078883), (-39.454029523, -5.646939381), (-42.074581417, -2.072957558))
        make_face()
    # profile 3 of 9: a face of its own
    with BuildSketch(Plane(origin=(0, 1, 0), x_dir=(1, 0, 0), z_dir=(0, 1, 0))):
        with BuildLine():
            ThreePointArc((-39.092162192, 2.756362995), (-40.02782135, 0), (-39.092162192, -2.756362995))
            ThreePointArc((-39.092162192, -2.756362995), (-38.110681853, -2.885577333), (-37.981467516, -1.904096994))
            ThreePointArc((-37.981467516, -1.904096994), (-38.62782135, 0), (-37.981467516, 1.904096994))
            ThreePointArc((-37.981467516, 1.904096994), (-38.110681853, 2.885577333), (-39.092162192, 2.756362995))
        make_face()
    # profile 4 of 9: a face of its own
    with BuildSketch(Plane(origin=(0, 1, 0), x_dir=(1, 0, 0), z_dir=(0, 1, 0))):
        with BuildLine():
            ThreePointArc((-36.188787516, -4.475124348), (-33.322168783, -3.969662122), (-31.355633143, -1.823565061))
            ThreePointArc((-31.355633143, -1.823565061), (-31.714428496, -0.900924343), (-32.637069214, -1.259719695))
            ThreePointArc((-32.637069214, -1.259719695), (-33.99555306, -2.742244664), (-35.975814775, -3.091418234))
            ThreePointArc((-35.975814775, -3.091418234), (-36.774154203, -3.676784921), (-36.188787516, -4.475124348))
        make_face()
    # profile 5 of 9: a face of its own
    with BuildSketch(Plane(origin=(0, 1, 0), x_dir=(1, 0, 0), z_dir=(0, 1, 0))):
        with BuildLine():
            ThreePointArc((-30.030907599, -4.196582199), (-28.606359899, 0), (-30.030907599, 4.196582199))
            ThreePointArc((-30.030907599, 4.196582199), (-31.012387938, 4.325796537), (-31.141602275, 3.344316198))
            ThreePointArc((-31.141602275, 3.344316198), (-30.006359899, 0), (-31.141602275, -3.344316198))
            ThreePointArc((-31.141602275, -3.344316198), (-31.012387938, -4.325796537), (-30.030907599, -4.196582199))
        make_face()
    # profile 6 of 9: a face of its own
    with BuildSketch(Plane(origin=(0, 1, 0), x_dir=(1, 0, 0), z_dir=(0, 1, 0))):
        with Locations(Location((-35.5, 0, 0), (0, 0, 270))):
            Circle(SKETCH51_R)
        with Locations((-35.5, 0)):
            Circle(SKETCH51_R_2, mode=Mode.SUBTRACT)
    # profile 7 of 9: a face of its own
    with BuildSketch(Plane(origin=(0, 1, 0), x_dir=(1, 0, 0), z_dir=(0, 1, 0))):
        with Locations((-35.5, 0)):
            Circle(SKETCH51_R_2)
        with Locations((-35.5, 0)):
            Circle(SKETCH51_R_3, mode=Mode.SUBTRACT)
    # profile 8 of 9: a face of its own
    with BuildSketch(Plane(origin=(0, 1, 0), x_dir=(1, 0, 0), z_dir=(0, 1, 0))):
        with Locations((-35.5, 0)):
            Circle(SKETCH51_R_3)
    # profile 9 of 9: a face of its own
    with BuildSketch(Plane(origin=(0, 1, 0), x_dir=(1, 0, 0), z_dir=(0, 1, 0))):
        with BuildLine():
            ThreePointArc((-36.671886398, 4.373539578), (-33.767277785, 4.183161472), (-31.578791687, 2.263910675))
            ThreePointArc((-31.578791687, 2.263910675), (-31.83500947, 1.307692892), (-32.791227253, 1.563910675))
            ThreePointArc((-32.791227253, 1.563910675), (-34.30303459, 2.889730126), (-36.309539735, 3.021243422))
            ThreePointArc((-36.309539735, 3.021243422), (-37.166861145, 3.516218168), (-36.671886398, 4.373539578))
        make_face()
    extrude(amount=-CUT_EXTRUDE23_DEPTH, mode=Mode.SUBTRACT)

    # Sketch53 → Cut-Extrude24 (cut)
    with BuildSketch(Plane(origin=(46, 0, 0), x_dir=(0, 0, -1), z_dir=(1, 0, 0))):
        Polygon((22.5, -17.34806117), (-22.5, -17.34806117), (-22.5, -27.496622415), (22.5, -27.496622415), (22.5, -21.6), (20.5, -21.6), (20.5, -19.6), (22.5, -19.6), align=None)
    extrude(amount=-CUT_EXTRUDE24_DEPTH, mode=Mode.SUBTRACT)

    # Cut-Extrude26 outline → Cut-Extrude26 (cut)
    with BuildSketch(Plane.YZ.offset(CUT_EXTRUDE26_START)):
        with Locations((-20.6, -21.5)):
            Rectangle(CUT_EXTRUDE26_OUTLINE_W, CUT_EXTRUDE26_OUTLINE_H)
    extrude(amount=CUT_EXTRUDE26_DEPTH, mode=Mode.SUBTRACT)

    # Sketch55 → Boss-Extrude25 (add)
    with BuildSketch(Plane(origin=(46, 0, 0), x_dir=(0, 0, -1), z_dir=(1, 0, 0))):
        with Locations((-21.5, -22.6)):
            Rectangle(SKETCH55_W, SKETCH55_H)
        with Locations((-21.5, -26.4)):
            Rectangle(SKETCH55_W, SKETCH55_H)
        with Locations((21.5, -22.6)):
            Rectangle(SKETCH55_W, SKETCH55_H)
        with Locations((21.5, -26.4)):
            Rectangle(SKETCH55_W, SKETCH55_H)
    extrude(amount=-BOSS_EXTRUDE25_DEPTH)

    # Sketch57 → Cut-Extrude28 (cut)
    with BuildSketch(Plane.XZ.offset(47)):
        with Locations((47.5, 23)):
            Rectangle(SKETCH57_W, SKETCH57_H)
        with Locations((47.5, -23)):
            Rectangle(SKETCH57_W, SKETCH57_H)
    extrude(amount=-CUT_EXTRUDE28_DEPTH, mode=Mode.SUBTRACT)

    # Sketch58 → Boss-Extrude27 (add)
    with BuildSketch(Plane(origin=(46, 0, 0), x_dir=(0, 0, -1), z_dir=(1, 0, 0))):
        with Locations((21.5, -23.625)):
            Rectangle(SKETCH58_W, SKETCH58_H)
        with Locations((21.5, -25.375)):
            Rectangle(SKETCH58_W, SKETCH58_H)
        with Locations((-21.5, -25.375)):
            Rectangle(SKETCH58_W, SKETCH58_H)
        with Locations((-21.5, -23.625)):
            Rectangle(SKETCH58_W, SKETCH58_H)
    extrude(amount=-BOSS_EXTRUDE27_DEPTH)

    # Sketch60 → Cut-Extrude29 (cut)
    with BuildSketch(Plane(origin=(46, 0, 0), x_dir=(0, 0, -1), z_dir=(1, 0, 0))):
        with Locations((-21.5, -21.625)):
            Rectangle(SKETCH60_W, SKETCH60_H)
        with Locations((-21.5, -27.375)):
            Rectangle(SKETCH60_W, SKETCH60_H)
        with Locations((21.5, -27.375)):
            Rectangle(SKETCH60_W, SKETCH60_H)
        with Locations((21.5, -21.625)):
            Rectangle(SKETCH60_W, SKETCH60_H)
    extrude(amount=-CUT_EXTRUDE29_DEPTH, mode=Mode.SUBTRACT)

    # Sketch62 → Cut-Extrude30 (cut)
    with BuildSketch(Plane.XZ.offset(50)):
        with Locations((4, 11)):
            Rectangle(SKETCH62_W, SKETCH62_H)
        with Locations((4, -10)):
            Rectangle(SKETCH62_W, SKETCH62_H)
    extrude(amount=-CUT_EXTRUDE30_DEPTH, mode=Mode.SUBTRACT)

    # Sketch63 → Boss-Extrude28 (add)
    with BuildSketch(Plane.XZ.offset(50)):
        with Locations((4, 11)):
            Rectangle(SKETCH63_W, SKETCH63_H)
    extrude(amount=-BOSS_EXTRUDE28_DEPTH)

    # Sketch64 → Boss-Extrude29 (add)
    with BuildSketch(Plane(origin=(45, 0, 0), x_dir=(0, 0, -1), z_dir=(1, 0, 0))):
        with Locations((-12.5, -49)):
            Rectangle(SKETCH64_W, SKETCH64_H)
    extrude(amount=-BOSS_EXTRUDE29_DEPTH)

    # Sketch66 → Cut-Extrude31 (cut)
    with BuildSketch(Plane(origin=(45, 0, 0), x_dir=(0, 0, -1), z_dir=(1, 0, 0))):
        with Locations((11.25, -48.5)):
            Rectangle(SKETCH66_W, SKETCH66_H)
        with Locations((-11.25, -48.5)):
            Rectangle(SKETCH66_W, SKETCH66_H)
    extrude(amount=-CUT_EXTRUDE31_DEPTH, mode=Mode.SUBTRACT)

    # Sketch67 → Boss-Extrude30 (add)
    with BuildSketch(Plane(origin=(-37, 0, 0), x_dir=(0, 0, -1), z_dir=(1, 0, 0))):
        with Locations((0.601630629, -48.5)):
            Rectangle(SKETCH67_W, SKETCH67_H)
    extrude(amount=BOSS_EXTRUDE30_DEPTH)

    # Sketch69 → Boss-Extrude31 (add)
    with BuildSketch(Plane(origin=(45, 0, 0), x_dir=(0, 0, -1), z_dir=(1, 0, 0))):
        with Locations((0, -48.5)):
            Rectangle(SKETCH69_W, SKETCH69_H)
    extrude(amount=BOSS_EXTRUDE31_DEPTH)

    # Fillet11
    fillet11_edges = [part.edges().sort_by_distance(p)[0] for p in [
        (45.5, -50, -25.5),
        (45.5, -50, 25.5),
    ]]
    fillet(fillet11_edges, radius=FILLET11_R)


with BuildPart() as body_2:
    # Sketch52 → Boss-Extrude24 (new body)
    with BuildSketch(Plane(origin=(46, 0, 0), x_dir=(0, 0, -1), z_dir=(1, 0, 0))):
        with Locations((12.96394923, -8.248996189)):
            Rectangle(SKETCH52_W, SKETCH52_H)
    extrude(amount=-BOSS_EXTRUDE24_DEPTH)

    # Sketch56 → Cut-Extrude27 (cut)
    with BuildSketch(Plane(origin=(46, 0, 0), x_dir=(0, 0, -1), z_dir=(1, 0, 0))):
        with Locations((12.687626972, -8.31823896)):
            Rectangle(SKETCH56_W, SKETCH56_H)
    extrude(amount=-CUT_EXTRUDE27_DEPTH, mode=Mode.SUBTRACT)


solid = part.part
